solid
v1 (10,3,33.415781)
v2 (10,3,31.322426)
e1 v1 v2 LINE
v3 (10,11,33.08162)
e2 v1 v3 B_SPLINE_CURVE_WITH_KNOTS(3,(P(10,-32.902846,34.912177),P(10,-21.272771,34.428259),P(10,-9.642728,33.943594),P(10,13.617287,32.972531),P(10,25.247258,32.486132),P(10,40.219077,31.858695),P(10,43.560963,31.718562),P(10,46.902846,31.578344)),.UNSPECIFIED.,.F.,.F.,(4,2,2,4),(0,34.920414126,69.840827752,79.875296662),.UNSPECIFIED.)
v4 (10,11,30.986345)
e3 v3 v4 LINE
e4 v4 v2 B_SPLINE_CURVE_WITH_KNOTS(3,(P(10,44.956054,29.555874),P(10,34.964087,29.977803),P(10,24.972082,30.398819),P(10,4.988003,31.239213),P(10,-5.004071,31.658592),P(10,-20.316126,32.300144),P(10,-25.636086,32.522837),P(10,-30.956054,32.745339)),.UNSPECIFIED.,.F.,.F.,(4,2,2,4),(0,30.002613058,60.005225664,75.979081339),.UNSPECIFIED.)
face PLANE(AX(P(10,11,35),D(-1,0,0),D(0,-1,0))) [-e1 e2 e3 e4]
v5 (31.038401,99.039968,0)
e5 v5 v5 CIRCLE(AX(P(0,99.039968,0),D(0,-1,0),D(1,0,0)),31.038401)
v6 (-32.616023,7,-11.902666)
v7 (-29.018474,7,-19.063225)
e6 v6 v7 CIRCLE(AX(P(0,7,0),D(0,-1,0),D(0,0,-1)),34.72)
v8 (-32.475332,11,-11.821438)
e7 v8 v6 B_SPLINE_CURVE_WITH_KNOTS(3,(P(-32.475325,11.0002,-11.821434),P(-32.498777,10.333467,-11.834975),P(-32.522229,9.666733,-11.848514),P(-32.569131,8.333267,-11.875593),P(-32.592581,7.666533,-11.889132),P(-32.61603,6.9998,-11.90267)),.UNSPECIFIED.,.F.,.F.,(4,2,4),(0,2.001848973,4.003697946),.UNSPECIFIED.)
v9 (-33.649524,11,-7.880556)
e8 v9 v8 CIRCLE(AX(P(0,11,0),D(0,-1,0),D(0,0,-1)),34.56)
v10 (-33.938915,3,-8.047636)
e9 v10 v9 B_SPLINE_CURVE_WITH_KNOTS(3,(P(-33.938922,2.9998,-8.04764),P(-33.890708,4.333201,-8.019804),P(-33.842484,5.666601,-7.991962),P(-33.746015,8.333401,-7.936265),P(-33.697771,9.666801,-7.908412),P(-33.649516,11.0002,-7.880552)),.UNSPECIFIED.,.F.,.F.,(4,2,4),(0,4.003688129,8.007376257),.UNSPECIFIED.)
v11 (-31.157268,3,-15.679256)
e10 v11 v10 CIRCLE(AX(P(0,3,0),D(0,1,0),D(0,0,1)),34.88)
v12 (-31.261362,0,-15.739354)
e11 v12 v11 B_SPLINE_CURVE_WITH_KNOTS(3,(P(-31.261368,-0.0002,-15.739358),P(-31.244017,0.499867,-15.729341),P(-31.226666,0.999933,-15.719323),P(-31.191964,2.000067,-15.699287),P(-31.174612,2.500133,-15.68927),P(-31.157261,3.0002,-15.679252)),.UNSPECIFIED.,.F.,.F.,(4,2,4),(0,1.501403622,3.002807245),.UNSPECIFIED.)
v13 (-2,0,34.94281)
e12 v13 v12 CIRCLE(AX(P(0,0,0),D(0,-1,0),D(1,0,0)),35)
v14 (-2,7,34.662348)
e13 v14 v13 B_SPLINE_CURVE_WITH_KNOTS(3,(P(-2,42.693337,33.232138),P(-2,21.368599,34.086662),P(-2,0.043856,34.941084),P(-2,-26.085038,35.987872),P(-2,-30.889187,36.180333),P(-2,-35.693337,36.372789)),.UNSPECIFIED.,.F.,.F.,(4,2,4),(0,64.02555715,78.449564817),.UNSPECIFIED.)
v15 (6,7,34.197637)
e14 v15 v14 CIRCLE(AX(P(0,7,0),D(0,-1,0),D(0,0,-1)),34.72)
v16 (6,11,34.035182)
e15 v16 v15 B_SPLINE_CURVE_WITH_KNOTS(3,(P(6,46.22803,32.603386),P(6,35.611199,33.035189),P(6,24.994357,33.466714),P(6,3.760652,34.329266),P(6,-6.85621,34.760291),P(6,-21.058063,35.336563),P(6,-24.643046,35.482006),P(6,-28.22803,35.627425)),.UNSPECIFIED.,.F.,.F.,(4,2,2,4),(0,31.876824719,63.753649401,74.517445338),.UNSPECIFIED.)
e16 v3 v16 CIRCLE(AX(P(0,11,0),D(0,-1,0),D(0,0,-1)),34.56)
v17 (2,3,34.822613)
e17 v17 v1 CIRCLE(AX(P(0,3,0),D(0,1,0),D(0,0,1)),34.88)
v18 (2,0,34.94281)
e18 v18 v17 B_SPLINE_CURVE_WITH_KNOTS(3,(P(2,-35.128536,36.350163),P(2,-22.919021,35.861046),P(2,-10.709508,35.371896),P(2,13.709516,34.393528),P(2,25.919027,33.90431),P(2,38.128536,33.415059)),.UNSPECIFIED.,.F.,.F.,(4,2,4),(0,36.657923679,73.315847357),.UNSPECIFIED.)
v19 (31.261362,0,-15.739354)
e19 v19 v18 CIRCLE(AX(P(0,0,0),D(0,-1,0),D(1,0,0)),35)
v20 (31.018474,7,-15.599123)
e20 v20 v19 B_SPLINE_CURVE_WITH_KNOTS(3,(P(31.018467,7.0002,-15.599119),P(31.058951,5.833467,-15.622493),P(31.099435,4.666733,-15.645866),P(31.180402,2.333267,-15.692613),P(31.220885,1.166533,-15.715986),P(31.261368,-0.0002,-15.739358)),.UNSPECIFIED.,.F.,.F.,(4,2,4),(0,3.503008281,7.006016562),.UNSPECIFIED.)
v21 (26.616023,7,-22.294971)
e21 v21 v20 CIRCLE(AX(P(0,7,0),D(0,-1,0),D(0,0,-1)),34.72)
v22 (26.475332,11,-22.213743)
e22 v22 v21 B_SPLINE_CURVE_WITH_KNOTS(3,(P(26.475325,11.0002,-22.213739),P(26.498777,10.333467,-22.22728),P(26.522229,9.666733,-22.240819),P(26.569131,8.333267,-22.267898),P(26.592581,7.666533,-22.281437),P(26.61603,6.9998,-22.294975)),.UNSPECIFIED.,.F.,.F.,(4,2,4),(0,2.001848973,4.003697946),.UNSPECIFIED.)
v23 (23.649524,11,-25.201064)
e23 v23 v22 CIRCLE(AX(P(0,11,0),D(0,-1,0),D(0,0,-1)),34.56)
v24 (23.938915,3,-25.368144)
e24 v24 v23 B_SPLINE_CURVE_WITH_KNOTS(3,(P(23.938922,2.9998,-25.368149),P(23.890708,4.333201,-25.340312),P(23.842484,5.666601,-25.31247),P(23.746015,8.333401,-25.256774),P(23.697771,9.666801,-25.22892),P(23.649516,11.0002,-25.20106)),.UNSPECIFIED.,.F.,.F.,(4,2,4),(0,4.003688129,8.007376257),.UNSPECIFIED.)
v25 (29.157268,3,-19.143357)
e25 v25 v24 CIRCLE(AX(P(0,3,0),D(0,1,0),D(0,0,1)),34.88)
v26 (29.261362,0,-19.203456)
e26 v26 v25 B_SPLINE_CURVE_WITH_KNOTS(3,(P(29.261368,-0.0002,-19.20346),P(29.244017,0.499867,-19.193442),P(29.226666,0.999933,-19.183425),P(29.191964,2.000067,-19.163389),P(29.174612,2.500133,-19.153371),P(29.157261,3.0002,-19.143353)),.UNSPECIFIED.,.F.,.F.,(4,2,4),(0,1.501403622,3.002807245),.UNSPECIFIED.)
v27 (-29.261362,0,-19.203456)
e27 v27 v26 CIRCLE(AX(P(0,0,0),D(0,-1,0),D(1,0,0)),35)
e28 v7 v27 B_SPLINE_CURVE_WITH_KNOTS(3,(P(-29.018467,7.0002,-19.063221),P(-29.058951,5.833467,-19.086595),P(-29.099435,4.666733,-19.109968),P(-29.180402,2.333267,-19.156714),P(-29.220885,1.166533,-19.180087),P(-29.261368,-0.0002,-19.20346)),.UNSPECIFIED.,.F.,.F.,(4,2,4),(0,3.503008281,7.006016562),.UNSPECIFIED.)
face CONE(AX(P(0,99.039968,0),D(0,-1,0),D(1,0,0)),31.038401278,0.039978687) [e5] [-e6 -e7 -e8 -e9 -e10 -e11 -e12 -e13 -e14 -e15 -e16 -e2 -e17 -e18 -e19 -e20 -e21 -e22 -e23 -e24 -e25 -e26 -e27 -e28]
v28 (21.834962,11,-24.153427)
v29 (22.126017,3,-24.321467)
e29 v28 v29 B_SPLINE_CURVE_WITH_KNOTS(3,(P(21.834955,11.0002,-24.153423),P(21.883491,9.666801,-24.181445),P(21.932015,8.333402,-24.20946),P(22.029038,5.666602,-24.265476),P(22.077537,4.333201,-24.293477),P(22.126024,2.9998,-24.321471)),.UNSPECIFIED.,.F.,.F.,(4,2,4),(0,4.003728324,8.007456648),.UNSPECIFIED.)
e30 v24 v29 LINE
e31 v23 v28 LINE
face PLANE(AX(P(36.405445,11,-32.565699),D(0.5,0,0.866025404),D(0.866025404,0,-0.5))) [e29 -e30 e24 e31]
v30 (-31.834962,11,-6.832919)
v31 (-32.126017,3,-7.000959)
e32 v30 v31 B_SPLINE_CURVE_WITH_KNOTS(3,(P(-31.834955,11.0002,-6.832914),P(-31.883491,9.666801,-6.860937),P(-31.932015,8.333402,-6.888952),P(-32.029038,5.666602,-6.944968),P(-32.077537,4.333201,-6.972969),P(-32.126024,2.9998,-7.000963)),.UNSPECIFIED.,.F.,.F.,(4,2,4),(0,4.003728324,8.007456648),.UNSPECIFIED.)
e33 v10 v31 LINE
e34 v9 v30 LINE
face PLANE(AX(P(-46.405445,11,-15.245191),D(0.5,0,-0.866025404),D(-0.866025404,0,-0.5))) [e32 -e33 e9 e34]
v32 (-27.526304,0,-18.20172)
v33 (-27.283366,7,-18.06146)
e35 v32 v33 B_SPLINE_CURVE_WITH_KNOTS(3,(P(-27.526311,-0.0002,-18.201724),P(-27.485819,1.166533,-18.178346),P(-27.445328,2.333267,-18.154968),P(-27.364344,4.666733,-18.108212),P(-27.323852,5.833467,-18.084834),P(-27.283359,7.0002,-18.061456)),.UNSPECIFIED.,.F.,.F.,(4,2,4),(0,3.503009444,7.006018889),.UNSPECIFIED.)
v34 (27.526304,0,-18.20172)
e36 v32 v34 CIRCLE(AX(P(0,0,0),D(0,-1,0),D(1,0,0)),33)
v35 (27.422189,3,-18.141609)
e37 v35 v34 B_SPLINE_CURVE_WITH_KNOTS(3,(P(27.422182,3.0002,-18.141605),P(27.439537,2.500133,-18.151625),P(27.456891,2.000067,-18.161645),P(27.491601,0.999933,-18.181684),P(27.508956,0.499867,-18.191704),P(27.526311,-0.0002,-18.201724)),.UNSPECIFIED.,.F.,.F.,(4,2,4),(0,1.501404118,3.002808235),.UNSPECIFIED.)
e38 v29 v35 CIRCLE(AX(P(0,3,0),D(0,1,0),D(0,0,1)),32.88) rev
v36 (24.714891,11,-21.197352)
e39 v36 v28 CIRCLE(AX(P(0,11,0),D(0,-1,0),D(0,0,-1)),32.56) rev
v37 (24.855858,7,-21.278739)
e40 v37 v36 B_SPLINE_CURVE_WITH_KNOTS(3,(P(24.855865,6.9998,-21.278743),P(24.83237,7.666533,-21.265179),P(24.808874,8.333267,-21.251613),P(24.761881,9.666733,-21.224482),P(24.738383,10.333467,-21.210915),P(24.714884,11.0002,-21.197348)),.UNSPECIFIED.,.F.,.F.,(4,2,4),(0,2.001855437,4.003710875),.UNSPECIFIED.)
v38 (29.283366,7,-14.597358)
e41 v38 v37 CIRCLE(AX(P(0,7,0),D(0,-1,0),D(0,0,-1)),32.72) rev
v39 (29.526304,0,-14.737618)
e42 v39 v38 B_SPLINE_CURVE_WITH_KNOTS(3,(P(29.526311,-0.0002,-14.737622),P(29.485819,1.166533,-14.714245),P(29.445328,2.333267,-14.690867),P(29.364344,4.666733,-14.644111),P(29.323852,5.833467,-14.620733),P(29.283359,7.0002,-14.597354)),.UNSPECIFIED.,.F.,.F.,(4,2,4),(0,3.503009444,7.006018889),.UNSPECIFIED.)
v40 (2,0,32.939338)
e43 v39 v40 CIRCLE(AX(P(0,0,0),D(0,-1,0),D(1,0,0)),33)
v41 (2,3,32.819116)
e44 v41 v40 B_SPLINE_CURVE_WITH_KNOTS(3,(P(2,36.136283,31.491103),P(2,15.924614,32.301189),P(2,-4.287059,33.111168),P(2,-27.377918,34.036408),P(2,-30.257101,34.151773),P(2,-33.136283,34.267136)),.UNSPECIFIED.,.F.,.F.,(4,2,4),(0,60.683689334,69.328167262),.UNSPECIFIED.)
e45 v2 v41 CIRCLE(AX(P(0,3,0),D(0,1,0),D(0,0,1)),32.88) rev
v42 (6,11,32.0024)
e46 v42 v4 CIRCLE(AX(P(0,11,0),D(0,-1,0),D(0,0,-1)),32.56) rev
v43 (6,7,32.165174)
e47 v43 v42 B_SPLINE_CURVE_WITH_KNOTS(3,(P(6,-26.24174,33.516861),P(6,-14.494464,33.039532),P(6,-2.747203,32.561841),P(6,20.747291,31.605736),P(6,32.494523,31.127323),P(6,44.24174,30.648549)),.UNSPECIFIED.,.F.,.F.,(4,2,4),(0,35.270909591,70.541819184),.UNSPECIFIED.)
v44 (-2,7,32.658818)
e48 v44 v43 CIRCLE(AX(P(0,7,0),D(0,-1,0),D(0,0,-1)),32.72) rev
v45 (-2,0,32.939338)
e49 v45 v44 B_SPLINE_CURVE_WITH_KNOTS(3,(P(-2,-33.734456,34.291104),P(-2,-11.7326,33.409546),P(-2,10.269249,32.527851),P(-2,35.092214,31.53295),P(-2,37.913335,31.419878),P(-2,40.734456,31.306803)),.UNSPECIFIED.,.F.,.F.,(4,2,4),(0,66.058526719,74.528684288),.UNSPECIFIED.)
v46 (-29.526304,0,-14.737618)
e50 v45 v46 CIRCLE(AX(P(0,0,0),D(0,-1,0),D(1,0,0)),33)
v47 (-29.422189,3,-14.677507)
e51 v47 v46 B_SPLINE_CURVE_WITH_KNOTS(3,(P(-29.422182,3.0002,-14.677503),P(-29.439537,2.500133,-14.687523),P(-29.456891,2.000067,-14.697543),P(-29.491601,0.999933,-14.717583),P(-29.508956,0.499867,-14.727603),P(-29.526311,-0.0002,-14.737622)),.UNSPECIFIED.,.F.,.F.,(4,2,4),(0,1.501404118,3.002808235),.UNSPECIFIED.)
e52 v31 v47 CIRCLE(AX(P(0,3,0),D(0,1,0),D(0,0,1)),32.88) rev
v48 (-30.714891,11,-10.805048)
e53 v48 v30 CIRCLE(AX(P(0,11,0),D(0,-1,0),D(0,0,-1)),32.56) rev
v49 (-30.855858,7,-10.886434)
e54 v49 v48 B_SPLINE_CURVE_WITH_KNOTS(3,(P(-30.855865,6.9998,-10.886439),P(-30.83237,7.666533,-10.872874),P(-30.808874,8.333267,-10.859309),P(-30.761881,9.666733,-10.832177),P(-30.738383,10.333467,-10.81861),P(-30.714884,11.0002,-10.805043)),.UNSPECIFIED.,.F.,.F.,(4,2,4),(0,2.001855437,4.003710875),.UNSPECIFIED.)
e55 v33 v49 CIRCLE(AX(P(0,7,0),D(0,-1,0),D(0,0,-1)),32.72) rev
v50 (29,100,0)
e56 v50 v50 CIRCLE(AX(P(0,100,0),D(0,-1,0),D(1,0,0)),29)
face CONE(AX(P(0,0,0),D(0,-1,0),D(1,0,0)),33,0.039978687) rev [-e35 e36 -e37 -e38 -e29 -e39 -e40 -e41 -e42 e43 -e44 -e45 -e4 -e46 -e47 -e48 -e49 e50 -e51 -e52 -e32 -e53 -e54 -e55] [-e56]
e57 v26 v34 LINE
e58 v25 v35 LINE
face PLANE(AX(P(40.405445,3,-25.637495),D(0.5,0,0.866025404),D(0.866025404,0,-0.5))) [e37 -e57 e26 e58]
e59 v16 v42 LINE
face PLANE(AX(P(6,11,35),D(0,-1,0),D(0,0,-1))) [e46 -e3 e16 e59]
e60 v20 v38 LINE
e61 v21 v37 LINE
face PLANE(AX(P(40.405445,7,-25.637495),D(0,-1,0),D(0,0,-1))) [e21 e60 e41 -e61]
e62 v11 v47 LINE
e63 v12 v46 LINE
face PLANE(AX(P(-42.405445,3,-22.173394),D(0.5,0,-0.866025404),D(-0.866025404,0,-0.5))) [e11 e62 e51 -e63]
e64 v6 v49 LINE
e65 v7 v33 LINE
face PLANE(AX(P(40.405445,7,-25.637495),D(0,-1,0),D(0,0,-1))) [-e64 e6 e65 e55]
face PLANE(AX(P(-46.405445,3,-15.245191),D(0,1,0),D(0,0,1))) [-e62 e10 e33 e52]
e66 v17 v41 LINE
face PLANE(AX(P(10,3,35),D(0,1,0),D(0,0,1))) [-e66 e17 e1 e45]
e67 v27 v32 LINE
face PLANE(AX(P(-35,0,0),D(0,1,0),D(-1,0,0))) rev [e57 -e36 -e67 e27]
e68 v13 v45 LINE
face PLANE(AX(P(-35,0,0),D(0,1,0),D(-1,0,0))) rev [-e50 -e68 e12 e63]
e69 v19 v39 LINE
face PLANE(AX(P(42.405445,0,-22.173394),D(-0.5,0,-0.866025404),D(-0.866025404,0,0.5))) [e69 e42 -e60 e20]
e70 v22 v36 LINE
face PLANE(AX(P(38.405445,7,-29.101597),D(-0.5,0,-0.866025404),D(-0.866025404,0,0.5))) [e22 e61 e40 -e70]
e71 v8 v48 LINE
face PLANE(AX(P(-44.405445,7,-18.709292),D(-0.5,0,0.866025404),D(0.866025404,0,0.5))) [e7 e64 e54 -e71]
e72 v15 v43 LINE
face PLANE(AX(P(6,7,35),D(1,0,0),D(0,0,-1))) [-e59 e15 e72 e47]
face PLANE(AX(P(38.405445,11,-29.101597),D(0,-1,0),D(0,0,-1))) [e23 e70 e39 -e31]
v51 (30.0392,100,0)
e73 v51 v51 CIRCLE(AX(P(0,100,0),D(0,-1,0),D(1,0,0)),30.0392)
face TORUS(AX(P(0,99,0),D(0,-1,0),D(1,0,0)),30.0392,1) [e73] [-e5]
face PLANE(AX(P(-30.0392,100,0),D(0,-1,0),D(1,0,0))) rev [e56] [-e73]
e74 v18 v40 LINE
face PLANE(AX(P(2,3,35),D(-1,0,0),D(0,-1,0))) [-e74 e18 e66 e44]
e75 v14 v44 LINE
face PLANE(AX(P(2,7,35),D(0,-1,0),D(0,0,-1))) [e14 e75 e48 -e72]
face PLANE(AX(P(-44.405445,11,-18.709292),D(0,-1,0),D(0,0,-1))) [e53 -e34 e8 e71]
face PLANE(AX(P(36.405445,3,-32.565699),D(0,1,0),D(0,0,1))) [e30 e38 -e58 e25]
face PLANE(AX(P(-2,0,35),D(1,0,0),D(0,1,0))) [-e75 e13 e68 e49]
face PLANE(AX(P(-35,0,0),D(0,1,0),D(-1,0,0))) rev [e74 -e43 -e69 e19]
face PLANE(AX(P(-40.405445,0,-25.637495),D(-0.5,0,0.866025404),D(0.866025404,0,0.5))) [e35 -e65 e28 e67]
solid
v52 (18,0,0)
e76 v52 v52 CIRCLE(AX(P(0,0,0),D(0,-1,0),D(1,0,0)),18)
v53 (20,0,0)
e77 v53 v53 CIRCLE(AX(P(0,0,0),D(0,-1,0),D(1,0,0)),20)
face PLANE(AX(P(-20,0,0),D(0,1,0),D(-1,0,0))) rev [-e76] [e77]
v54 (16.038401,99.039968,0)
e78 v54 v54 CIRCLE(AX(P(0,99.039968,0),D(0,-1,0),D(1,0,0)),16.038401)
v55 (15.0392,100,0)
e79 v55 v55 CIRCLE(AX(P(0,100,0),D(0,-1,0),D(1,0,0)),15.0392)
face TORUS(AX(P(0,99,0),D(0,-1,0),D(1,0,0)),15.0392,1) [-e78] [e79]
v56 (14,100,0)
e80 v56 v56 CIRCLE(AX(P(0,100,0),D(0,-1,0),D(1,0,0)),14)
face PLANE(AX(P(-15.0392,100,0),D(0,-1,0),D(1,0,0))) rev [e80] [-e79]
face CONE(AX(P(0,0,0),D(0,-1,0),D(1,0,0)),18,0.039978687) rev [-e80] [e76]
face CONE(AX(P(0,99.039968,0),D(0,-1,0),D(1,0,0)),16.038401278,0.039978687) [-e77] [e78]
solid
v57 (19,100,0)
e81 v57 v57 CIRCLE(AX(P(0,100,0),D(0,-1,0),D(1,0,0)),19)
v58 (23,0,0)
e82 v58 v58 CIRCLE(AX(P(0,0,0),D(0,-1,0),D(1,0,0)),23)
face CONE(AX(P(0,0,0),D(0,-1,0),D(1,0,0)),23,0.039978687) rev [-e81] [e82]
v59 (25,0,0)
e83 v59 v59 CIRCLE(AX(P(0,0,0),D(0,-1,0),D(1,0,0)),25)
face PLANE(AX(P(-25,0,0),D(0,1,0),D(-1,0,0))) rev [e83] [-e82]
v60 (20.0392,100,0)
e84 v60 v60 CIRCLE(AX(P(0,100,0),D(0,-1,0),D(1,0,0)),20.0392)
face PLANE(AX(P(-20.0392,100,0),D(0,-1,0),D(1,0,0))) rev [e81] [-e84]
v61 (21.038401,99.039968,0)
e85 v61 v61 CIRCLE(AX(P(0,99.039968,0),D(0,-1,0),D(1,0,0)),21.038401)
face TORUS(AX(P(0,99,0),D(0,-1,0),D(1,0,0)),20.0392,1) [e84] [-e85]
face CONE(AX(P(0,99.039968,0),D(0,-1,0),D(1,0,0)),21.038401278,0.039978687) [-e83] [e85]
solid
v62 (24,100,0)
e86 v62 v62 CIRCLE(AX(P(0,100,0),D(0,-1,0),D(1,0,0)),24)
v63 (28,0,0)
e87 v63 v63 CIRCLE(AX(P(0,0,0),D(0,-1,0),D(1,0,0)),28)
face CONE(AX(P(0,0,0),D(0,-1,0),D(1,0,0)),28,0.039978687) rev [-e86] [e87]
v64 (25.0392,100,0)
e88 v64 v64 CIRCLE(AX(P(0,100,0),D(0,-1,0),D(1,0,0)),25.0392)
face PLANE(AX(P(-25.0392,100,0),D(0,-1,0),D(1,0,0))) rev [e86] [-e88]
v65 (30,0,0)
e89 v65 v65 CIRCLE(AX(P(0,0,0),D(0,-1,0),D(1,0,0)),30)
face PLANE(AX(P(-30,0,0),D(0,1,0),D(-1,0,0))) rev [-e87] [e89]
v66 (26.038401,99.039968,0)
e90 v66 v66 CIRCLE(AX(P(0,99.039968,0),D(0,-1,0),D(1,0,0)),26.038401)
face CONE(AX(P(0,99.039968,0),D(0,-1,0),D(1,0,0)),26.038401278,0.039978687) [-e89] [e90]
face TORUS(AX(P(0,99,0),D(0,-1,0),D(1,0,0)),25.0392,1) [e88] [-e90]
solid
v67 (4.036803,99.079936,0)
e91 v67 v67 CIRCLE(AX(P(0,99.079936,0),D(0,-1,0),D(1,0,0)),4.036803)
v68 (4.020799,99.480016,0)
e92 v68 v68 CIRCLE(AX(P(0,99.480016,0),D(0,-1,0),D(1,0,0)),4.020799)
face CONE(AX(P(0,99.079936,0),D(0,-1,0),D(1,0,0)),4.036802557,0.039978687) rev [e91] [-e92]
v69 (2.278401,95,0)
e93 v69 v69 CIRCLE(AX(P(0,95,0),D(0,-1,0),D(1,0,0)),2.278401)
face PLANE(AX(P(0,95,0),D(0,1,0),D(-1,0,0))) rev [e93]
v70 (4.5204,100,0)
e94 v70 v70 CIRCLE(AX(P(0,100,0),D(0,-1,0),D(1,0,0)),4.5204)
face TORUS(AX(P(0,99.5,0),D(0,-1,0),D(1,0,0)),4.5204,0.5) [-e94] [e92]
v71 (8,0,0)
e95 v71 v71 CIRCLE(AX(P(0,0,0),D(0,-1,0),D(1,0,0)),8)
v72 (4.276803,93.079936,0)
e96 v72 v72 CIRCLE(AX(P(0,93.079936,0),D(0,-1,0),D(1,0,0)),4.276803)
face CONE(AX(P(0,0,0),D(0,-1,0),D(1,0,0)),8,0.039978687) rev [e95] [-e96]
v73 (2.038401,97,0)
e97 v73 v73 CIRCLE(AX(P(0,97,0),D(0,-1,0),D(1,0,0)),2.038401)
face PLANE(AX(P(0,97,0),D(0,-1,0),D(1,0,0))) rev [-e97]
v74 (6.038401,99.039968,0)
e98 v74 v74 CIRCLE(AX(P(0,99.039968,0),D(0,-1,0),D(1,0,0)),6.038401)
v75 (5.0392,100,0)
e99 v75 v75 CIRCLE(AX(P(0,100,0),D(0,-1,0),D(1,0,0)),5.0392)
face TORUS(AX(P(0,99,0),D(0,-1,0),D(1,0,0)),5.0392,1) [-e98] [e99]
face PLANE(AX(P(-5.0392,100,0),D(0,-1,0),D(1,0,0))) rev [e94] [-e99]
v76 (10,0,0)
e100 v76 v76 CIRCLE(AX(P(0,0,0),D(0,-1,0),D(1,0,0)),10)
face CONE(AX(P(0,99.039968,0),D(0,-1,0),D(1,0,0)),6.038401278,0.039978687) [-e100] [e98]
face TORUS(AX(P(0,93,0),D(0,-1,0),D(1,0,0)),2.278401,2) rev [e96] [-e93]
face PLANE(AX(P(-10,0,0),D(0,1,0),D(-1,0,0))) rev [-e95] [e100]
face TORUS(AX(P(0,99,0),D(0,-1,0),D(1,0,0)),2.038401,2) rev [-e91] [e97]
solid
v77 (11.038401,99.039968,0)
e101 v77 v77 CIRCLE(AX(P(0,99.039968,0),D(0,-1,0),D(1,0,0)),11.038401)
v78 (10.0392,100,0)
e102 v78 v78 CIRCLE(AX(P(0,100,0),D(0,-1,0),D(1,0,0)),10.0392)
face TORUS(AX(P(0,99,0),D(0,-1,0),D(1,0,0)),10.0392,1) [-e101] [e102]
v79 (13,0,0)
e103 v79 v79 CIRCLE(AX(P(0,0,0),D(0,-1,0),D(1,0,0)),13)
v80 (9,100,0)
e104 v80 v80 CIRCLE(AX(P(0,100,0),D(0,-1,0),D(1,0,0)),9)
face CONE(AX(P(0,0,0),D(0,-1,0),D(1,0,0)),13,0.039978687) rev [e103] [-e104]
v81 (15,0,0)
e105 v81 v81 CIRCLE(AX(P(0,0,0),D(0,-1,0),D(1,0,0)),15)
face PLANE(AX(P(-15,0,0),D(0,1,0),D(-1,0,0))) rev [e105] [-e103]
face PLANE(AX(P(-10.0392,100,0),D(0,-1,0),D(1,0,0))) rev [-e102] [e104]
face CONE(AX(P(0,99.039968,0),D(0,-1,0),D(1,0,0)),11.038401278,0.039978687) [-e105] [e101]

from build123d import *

# Parameters (mm, degrees)
CUT_EXTRUDE_START        = 30
CUT_EXTRUDE_2_DEPTH      = 6
PATTERN_CIRCULAR_1_COUNT = 3


with BuildPart() as part:
    # Эскиз6 → Повернуть1 (revolve)
    with BuildSketch(Plane.XY, mode=Mode.PRIVATE) as revolve_1_sk:
        with BuildLine():
            Line((-35, 0), (-31.038401278, 99.039968038))
            ThreePointArc((-31.038401278, 99.039968038), (-30.732032176, 99.721099174), (-30.03920032, 100))
            Line((-30.03920032, 100), (-29, 100))
            Line((-29, 100), (-33, 0))
            Line((-33, 0), (-35, 0))
        make_face()
        with BuildLine():
            Line((-24, 100), (-28, 0))
            Line((-28, 0), (-30, 0))
            Line((-30, 0), (-26.038401278, 99.039968038))
            ThreePointArc((-26.038401278, 99.039968038), (-25.732032176, 99.721099174), (-25.03920032, 100))
            Line((-25.03920032, 100), (-24, 100))
        make_face()
        with BuildLine():
            Line((-19, 100), (-23, 0))
            Line((-23, 0), (-25, 0))
            Line((-25, 0), (-21.038401278, 99.039968038))
            ThreePointArc((-21.038401278, 99.039968038), (-20.732032176, 99.721099174), (-20.03920032, 100))
            Line((-20.03920032, 100), (-19, 100))
        make_face()
        with BuildLine():
            Line((-14, 100), (-18, 0))
            Line((-18, 0), (-20, 0))
            Line((-20, 0), (-16.038401278, 99.039968038))
            ThreePointArc((-16.038401278, 99.039968038), (-15.732032176, 99.721099174), (-15.03920032, 100))
            Line((-15.03920032, 100), (-14, 100))
        make_face()
        with BuildLine():
            Line((-9, 100), (-13, 0))
            Line((-13, 0), (-15, 0))
            Line((-15, 0), (-11.038401278, 99.039968038))
            ThreePointArc((-11.038401278, 99.039968038), (-10.732032176, 99.721099174), (-10.03920032, 100))
            Line((-10.03920032, 100), (-9, 100))
        make_face()
        with BuildLine():
            Line((-4.020799361, 99.480015981), (-4.036802557, 99.079936077))
            ThreePointArc((-4.036802557, 99.079936077), (-3.480598988, 97.614336288), (-2.038400639, 97))
            Line((-2.038400639, 97), (0, 97))
            Line((0, 97), (0, 95))
            Line((0, 95), (-2.278400639, 95))
            ThreePointArc((-2.278400639, 95), (-3.664064352, 94.442198349), (-4.276802557, 93.079936077))
            Line((-4.276802557, 93.079936077), (-8, 0))
            Line((-8, 0), (-10, 0))
            Line((-10, 0), (-6.038401278, 99.039968038))
            ThreePointArc((-6.038401278, 99.039968038), (-5.732032176, 99.721099174), (-5.03920032, 100))
            Line((-5.03920032, 100), (-4.52039984, 100))
            ThreePointArc((-4.52039984, 100), (-4.159850253, 99.846415928), (-4.020799361, 99.480015981))
        make_face()
    revolve(revolve_1_sk.sketch.rotate(Axis((0, 0, 0), (0, 1, 0)), 180), axis=Axis((0, 0, 0), (0, 1, 0)))

    # Вырез-Вытянуть2: read off the stored shape, not the designer's step
    # Вырез-Вытянуть2 outline → Вырез-Вытянуть2 (cut)
    with BuildSketch(Plane.XY.offset(CUT_EXTRUDE_START)):
        Polygon((2, 0), (2, 3), (10, 3), (10, 11), (6, 11), (6, 7), (-2, 7), (-2, 0), align=None)
    cut_extrude_2 = extrude(amount=CUT_EXTRUDE_2_DEPTH, mode=Mode.SUBTRACT)

    # Круговой массив1: Вырез-Вытянуть2 ×3 about axis
    pattern_circular_1_axis = Axis((0, 0, 0), (0, 1, 0))
    for i in range(1, PATTERN_CIRCULAR_1_COUNT):
        add(cut_extrude_2.rotate(pattern_circular_1_axis, i * 360 / PATTERN_CIRCULAR_1_COUNT), mode=Mode.SUBTRACT)


solid = part.part
